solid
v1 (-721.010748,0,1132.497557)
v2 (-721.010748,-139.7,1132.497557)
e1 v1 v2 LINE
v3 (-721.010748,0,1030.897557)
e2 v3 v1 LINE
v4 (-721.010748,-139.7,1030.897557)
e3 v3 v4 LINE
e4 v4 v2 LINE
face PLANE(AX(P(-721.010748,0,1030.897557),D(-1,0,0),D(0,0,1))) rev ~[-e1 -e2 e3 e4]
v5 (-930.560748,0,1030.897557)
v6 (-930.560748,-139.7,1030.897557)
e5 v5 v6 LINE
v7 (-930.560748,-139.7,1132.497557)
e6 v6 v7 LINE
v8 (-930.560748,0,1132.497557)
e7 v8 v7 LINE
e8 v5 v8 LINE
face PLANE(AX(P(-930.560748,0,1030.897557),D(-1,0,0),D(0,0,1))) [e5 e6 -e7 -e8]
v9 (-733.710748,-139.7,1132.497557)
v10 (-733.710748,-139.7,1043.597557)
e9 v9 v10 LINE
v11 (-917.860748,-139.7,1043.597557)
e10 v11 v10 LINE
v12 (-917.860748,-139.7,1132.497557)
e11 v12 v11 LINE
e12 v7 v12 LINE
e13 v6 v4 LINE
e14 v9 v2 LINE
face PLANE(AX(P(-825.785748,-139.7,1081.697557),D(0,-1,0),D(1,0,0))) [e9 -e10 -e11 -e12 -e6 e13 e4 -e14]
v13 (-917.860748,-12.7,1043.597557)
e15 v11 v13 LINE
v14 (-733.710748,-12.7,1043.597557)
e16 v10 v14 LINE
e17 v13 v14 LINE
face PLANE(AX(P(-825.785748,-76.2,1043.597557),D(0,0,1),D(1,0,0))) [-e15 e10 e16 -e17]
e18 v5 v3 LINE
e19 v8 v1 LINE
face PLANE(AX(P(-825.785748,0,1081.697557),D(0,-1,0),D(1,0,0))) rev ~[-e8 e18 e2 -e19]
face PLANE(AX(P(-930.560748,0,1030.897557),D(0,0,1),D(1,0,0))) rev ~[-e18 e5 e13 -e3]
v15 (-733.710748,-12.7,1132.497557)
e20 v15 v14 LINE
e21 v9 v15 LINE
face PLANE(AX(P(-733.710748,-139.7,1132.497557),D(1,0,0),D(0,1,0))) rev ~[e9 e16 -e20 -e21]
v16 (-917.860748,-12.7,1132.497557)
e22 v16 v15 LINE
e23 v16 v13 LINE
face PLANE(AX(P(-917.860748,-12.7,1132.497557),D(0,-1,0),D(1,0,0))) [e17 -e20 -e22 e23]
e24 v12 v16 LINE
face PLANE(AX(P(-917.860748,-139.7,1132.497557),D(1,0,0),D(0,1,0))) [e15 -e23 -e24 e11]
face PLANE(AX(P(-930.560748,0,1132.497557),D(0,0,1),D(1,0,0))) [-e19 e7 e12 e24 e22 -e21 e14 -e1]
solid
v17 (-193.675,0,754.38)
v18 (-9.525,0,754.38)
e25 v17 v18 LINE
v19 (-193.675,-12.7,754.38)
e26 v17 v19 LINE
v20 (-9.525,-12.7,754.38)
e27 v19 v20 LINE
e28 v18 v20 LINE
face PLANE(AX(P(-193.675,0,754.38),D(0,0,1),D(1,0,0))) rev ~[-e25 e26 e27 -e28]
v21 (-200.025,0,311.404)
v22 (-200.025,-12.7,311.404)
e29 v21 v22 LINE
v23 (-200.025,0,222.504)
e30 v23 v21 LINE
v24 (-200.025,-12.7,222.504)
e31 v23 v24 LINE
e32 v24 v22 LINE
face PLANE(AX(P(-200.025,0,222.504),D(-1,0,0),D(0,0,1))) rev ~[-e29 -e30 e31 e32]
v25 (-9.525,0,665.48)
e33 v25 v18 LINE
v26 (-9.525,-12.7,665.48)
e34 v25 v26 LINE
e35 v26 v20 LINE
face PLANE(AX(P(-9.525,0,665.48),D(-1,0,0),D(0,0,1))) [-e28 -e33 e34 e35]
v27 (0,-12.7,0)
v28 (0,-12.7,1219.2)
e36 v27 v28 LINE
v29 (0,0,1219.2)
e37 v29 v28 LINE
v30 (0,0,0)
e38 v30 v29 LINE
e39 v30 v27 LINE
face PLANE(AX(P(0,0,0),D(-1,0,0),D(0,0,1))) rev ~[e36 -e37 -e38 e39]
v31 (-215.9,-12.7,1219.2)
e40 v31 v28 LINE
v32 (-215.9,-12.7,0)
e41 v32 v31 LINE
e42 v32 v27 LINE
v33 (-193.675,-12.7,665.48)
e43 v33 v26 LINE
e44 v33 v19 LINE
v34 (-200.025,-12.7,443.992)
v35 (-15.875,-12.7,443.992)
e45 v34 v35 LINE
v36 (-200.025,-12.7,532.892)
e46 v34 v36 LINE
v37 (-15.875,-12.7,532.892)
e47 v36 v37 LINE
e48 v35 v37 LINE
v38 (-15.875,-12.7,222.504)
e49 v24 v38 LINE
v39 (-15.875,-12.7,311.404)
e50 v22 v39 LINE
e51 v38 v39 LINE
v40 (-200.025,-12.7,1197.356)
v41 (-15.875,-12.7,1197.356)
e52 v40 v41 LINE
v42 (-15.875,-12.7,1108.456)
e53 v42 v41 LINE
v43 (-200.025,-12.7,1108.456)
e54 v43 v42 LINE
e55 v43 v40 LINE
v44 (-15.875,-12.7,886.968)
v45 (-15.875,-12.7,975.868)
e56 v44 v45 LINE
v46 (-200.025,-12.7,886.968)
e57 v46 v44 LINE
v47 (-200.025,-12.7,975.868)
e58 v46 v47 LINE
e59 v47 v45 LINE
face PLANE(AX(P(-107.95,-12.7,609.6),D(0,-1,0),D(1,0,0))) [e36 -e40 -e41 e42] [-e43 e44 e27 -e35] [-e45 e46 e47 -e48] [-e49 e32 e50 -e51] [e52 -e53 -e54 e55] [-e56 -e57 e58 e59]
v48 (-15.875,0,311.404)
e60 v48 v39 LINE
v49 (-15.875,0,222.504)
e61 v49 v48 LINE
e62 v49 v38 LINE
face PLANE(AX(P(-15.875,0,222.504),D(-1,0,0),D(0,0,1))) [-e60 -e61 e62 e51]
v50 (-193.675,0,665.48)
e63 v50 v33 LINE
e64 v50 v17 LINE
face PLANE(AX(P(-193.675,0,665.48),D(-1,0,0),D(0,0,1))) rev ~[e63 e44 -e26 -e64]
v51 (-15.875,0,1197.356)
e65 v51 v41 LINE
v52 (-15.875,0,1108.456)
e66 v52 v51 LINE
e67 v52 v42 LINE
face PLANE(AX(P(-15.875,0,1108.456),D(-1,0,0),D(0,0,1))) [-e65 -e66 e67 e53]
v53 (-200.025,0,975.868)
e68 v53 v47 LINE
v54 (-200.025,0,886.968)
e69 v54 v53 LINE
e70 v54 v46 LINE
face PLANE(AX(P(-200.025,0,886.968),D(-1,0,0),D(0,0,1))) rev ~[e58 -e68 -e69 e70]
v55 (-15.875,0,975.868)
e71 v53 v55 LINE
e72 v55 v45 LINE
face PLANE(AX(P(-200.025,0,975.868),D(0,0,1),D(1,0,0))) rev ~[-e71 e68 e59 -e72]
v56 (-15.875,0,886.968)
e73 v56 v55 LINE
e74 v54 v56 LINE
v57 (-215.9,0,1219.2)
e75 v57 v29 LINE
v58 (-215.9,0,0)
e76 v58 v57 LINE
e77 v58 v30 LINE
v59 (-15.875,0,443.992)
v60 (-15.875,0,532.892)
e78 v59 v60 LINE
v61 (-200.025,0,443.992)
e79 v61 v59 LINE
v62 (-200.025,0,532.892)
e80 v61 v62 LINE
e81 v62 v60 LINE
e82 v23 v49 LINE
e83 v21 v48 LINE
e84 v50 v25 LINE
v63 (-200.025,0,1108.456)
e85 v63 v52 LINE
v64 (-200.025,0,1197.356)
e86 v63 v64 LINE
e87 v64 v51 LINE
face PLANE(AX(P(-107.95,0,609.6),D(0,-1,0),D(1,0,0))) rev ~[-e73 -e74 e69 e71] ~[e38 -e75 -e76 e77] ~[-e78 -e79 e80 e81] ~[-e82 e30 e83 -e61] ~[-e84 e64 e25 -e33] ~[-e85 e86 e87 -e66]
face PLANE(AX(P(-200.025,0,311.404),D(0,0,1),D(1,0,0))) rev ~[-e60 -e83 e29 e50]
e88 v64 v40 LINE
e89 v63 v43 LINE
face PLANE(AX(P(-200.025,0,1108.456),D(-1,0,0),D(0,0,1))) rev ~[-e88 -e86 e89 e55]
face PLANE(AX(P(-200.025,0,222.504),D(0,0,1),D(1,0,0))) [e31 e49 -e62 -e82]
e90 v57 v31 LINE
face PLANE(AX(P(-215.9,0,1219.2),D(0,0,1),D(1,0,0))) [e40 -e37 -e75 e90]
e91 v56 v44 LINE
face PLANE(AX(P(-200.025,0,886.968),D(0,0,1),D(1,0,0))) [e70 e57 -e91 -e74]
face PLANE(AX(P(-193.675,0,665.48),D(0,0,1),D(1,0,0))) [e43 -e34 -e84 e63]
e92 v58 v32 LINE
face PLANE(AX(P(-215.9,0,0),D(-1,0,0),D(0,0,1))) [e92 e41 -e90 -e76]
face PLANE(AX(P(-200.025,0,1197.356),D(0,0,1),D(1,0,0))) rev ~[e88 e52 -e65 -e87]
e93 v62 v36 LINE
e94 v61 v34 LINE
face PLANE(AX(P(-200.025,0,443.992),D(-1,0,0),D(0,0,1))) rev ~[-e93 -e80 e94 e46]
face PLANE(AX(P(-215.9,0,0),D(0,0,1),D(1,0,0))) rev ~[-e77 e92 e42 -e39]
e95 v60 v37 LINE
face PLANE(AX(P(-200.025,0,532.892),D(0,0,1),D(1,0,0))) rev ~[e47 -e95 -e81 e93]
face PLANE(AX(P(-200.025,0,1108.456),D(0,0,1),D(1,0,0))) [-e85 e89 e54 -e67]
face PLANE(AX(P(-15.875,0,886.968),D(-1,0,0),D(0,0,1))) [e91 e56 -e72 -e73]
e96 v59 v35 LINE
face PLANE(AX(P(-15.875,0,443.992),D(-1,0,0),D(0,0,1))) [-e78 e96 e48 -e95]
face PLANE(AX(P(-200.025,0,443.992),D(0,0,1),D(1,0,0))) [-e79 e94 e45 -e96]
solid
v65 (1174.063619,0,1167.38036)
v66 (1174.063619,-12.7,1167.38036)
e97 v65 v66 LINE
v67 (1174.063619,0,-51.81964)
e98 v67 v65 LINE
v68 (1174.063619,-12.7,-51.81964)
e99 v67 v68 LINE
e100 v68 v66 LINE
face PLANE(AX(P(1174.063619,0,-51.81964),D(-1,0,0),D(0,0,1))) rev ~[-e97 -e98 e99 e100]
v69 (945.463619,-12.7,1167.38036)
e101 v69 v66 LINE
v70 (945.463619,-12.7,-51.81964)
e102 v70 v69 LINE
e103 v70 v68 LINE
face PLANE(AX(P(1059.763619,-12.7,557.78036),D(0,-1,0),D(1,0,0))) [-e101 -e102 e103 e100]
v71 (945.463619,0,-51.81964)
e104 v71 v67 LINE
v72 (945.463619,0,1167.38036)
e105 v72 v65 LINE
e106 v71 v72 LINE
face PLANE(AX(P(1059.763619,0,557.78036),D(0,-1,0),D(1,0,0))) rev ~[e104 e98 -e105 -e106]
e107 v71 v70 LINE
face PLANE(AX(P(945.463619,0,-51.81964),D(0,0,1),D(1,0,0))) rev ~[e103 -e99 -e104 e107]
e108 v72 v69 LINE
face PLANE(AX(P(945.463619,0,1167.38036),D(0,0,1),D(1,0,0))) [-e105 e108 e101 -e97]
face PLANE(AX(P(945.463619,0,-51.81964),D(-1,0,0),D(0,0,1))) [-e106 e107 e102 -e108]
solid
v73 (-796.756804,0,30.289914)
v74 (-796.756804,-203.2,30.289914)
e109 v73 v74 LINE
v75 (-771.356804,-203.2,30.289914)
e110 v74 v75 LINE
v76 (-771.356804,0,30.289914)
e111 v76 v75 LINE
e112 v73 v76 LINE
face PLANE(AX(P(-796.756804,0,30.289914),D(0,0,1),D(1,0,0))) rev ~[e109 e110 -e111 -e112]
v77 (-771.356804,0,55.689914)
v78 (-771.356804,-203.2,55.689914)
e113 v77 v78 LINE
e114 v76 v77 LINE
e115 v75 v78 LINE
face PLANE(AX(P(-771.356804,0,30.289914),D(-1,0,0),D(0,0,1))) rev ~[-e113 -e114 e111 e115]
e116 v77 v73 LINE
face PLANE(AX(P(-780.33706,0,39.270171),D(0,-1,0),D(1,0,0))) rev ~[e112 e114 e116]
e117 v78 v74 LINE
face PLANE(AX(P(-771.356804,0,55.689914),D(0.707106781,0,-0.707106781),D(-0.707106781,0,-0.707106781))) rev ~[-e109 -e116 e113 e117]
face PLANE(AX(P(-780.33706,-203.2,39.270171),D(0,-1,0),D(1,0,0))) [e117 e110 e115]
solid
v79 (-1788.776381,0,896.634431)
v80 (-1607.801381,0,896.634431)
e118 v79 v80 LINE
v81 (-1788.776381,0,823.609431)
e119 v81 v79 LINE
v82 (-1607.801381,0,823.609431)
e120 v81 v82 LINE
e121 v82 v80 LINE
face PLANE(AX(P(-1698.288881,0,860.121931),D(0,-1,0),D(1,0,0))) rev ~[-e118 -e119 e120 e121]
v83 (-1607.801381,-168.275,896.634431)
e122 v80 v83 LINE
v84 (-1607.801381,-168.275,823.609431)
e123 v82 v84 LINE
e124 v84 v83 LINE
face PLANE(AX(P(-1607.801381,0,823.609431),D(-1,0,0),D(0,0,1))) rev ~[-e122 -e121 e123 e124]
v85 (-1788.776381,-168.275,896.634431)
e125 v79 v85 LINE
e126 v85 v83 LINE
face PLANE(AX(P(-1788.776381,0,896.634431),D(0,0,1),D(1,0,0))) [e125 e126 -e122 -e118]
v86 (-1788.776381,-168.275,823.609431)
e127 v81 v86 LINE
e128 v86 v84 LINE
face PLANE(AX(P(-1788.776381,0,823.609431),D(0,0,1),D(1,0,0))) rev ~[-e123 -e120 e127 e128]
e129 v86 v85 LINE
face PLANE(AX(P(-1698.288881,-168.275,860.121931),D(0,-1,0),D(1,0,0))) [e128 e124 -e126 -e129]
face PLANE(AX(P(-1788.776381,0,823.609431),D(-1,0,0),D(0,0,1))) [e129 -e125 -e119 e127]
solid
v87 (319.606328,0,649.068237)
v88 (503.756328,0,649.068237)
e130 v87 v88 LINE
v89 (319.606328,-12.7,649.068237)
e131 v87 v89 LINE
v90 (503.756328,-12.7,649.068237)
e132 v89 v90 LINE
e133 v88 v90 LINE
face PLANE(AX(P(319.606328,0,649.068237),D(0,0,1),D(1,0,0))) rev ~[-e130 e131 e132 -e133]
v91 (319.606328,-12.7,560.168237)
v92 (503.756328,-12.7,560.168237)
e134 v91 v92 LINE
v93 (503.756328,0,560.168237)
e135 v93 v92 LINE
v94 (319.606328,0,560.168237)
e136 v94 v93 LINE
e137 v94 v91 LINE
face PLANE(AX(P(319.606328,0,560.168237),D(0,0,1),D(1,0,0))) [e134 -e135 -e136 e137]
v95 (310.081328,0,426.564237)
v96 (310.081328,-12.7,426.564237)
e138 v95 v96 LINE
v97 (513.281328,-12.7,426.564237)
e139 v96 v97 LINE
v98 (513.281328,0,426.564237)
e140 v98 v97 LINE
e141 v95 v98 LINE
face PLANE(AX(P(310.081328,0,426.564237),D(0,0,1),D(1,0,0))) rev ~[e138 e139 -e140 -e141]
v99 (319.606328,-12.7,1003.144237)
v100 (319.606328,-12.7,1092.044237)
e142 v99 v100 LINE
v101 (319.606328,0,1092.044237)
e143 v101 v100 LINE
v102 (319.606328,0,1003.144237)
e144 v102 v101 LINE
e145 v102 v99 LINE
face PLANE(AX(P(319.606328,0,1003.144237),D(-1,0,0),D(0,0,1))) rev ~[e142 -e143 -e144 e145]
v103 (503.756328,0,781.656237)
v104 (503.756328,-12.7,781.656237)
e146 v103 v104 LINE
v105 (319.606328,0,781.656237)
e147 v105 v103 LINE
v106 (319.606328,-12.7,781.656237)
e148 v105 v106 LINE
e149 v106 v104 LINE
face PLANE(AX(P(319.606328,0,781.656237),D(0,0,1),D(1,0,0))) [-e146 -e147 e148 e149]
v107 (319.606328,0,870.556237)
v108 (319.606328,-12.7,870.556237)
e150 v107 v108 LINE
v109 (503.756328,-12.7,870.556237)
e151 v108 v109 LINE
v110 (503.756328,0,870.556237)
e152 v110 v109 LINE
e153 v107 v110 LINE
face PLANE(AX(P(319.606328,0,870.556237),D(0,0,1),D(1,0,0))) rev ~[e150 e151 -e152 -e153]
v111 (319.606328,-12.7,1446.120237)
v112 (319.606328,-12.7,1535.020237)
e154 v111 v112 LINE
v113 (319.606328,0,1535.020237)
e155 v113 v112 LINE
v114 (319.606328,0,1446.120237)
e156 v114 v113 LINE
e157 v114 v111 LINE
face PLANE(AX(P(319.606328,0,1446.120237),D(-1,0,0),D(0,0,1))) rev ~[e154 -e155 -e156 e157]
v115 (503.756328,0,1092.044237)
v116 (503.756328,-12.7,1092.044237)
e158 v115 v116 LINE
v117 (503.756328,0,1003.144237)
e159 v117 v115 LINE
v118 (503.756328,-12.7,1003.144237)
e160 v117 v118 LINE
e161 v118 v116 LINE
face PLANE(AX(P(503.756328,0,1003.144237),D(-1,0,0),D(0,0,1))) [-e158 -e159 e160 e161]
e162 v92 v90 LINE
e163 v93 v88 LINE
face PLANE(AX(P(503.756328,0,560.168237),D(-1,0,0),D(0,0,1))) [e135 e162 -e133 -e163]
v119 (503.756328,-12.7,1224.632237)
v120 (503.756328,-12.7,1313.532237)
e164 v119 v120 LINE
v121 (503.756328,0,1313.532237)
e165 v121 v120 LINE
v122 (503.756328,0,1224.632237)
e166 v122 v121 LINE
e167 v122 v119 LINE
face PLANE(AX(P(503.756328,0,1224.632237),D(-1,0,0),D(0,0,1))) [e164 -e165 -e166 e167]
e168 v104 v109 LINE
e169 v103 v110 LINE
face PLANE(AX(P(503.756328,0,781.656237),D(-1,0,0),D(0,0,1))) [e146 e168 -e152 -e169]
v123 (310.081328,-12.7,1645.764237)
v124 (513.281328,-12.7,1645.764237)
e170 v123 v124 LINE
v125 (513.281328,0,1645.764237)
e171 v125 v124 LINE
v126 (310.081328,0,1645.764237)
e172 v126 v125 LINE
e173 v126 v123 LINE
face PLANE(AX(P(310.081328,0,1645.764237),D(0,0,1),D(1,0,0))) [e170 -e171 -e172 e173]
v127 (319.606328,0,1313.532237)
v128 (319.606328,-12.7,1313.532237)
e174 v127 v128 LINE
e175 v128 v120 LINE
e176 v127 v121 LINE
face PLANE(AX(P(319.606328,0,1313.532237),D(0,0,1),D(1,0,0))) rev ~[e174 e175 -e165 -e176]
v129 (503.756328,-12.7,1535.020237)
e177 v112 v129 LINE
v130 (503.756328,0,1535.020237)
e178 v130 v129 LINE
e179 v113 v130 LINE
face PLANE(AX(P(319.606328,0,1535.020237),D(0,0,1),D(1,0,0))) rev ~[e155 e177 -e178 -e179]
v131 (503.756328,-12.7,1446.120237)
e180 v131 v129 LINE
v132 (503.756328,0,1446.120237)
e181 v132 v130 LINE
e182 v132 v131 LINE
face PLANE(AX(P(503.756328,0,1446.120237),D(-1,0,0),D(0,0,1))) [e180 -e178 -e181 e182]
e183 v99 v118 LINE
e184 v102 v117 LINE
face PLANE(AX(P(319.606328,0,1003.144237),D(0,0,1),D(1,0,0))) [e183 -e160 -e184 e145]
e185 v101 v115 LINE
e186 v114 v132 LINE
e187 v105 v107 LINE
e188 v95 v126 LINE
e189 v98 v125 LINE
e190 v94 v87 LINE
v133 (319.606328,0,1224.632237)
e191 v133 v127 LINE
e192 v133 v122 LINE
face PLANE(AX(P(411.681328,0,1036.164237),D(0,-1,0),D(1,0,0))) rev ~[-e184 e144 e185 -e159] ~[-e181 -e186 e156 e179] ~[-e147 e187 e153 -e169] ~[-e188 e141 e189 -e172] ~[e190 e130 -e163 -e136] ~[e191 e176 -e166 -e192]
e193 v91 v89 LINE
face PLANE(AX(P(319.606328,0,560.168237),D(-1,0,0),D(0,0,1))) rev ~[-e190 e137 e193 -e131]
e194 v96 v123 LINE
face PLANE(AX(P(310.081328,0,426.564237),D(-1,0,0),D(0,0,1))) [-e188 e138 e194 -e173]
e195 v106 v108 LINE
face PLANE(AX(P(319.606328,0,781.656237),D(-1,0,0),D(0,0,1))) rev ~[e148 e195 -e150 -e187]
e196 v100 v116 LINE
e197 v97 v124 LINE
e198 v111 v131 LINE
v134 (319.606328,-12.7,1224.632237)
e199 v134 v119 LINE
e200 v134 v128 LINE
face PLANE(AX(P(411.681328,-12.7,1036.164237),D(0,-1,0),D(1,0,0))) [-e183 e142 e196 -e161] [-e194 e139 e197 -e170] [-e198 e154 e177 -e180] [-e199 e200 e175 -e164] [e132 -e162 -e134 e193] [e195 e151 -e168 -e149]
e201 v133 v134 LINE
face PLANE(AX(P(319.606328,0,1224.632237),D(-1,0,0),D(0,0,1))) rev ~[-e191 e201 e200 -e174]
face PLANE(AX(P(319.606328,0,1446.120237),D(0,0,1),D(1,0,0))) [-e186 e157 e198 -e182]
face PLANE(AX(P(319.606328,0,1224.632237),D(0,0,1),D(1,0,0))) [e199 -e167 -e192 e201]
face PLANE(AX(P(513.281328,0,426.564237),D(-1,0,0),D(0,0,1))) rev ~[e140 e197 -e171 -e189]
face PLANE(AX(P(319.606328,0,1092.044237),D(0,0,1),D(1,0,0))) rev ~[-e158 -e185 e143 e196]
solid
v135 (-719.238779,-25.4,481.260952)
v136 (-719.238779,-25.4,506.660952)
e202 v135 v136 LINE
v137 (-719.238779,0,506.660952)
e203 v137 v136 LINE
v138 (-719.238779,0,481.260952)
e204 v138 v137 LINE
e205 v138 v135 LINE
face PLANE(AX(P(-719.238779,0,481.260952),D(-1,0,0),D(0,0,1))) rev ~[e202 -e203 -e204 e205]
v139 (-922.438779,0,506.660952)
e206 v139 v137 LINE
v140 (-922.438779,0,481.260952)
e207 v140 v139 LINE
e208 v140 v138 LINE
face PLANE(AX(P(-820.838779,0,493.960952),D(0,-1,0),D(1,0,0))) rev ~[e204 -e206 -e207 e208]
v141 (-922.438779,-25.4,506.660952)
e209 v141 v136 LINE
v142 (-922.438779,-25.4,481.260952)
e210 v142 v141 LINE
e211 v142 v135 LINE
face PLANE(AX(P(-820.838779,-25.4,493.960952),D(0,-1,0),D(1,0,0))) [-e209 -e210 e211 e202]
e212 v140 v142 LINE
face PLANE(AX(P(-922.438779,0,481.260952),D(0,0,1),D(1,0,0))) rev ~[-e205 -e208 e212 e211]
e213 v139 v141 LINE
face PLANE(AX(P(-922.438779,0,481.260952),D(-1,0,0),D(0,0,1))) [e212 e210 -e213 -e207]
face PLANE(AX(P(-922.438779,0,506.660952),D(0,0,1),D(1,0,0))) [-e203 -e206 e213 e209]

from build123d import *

# Parameters (mm, degrees)
F0_W      = 215.9
F0_H      = 1219.2
F0_W_2    = 184.15
F0_H_2    = 88.9
F1_DEPTH  = 12.7
F2_W      = 203.2
F2_H      = 1219.2
F2_W_2    = 184.15
F2_H_2    = 88.9
F3_DEPTH  = 12.7
F4_W      = 209.55
F4_H      = 101.6
F5_DEPTH  = 139.7
F6_W      = 184.15
F6_H      = 127
F7_DEPTH  = 88.9
F8_W      = 203.2
F8_H      = 25.4
F10_DEPTH = 25.4
F9_W      = 180.975
F9_H      = 73.025
F11_DEPTH = 168.275
F12_W     = 228.6
F12_H     = 1219.2
F13_DEPTH = 12.7
F15_DEPTH = 203.2


# Not quite as in the source:
# - a feature names something its author has since deleted; it is built from what else it names


with BuildPart() as f1:
    # F0 (on Front) → F1 (new body)
    with BuildSketch(Plane.XZ):
        with Locations((-107.95, 609.6)):
            Rectangle(F0_W, F0_H)
        with Locations((-107.95, 266.954)):
            Rectangle(F0_W_2, F0_H_2, mode=Mode.SUBTRACT)
        with Locations((-107.95, 488.442)):
            Rectangle(F0_W_2, F0_H_2, mode=Mode.SUBTRACT)
        with Locations((-101.6, 709.93)):
            Rectangle(F0_W_2, F0_H_2, mode=Mode.SUBTRACT)
        with Locations((-107.95, 931.418)):
            Rectangle(F0_W_2, F0_H_2, mode=Mode.SUBTRACT)
        with Locations((-107.95, 1152.906)):
            Rectangle(F0_W_2, F0_H_2, mode=Mode.SUBTRACT)
    extrude(amount=F1_DEPTH)


with BuildPart() as f3:
    # F2 (on Front) → F3 (new body)
    with BuildSketch(Plane.XZ):
        with Locations((411.6813279688, 1036.1642371192)):
            Rectangle(F2_W, F2_H)
        with Locations((411.6813279688, 604.6182371192)):
            Rectangle(F2_W_2, F2_H_2, mode=Mode.SUBTRACT)
        with Locations((411.6813279688, 826.1062371192)):
            Rectangle(F2_W_2, F2_H_2, mode=Mode.SUBTRACT)
        with Locations((411.6813279688, 1047.5942371192)):
            Rectangle(F2_W_2, F2_H_2, mode=Mode.SUBTRACT)
        with Locations((411.6813279688, 1269.0822371192)):
            Rectangle(F2_W_2, F2_H_2, mode=Mode.SUBTRACT)
        with Locations((411.6813279688, 1490.5702371192)):
            Rectangle(F2_W_2, F2_H_2, mode=Mode.SUBTRACT)
    extrude(amount=F3_DEPTH)


with BuildPart() as f5:
    # F4 (on Front) → F5 (new body)
    with BuildSketch(Plane.XZ):
        with Locations((-825.7857475758, 1081.6975569915)):
            Rectangle(F4_W, F4_H)
    extrude(amount=F5_DEPTH)

    # F6 (on face) → F7 (cut)
    with BuildSketch(Plane.XY.offset(1132.4975569915)):
        with Locations((-825.7857475758, -76.2)):
            Rectangle(F6_W, F6_H)
    extrude(amount=-F7_DEPTH, mode=Mode.SUBTRACT)


with BuildPart() as f10:
    # F8 (on Front) → F10 (new body)
    with BuildSketch(Plane.XZ):
        with Locations((-820.838779211, 493.9609521501)):
            Rectangle(F8_W, F8_H)
    extrude(amount=F10_DEPTH)


with BuildPart() as f11:
    # F9 (on Front) → F11 (new body)
    with BuildSketch(Plane.XZ):
        with Locations((-1698.2888811625, 860.1219307423)):
            Rectangle(F9_W, F9_H)
    extrude(amount=F11_DEPTH)


with BuildPart() as f13:
    # F12 (on Front) → F13 (new body)
    with BuildSketch(Plane.XZ):
        with Locations((1059.7636188984, 557.7803601671)):
            Rectangle(F12_W, F12_H)
    extrude(amount=F13_DEPTH)


with BuildPart() as f15:
    # F14 (on Front) → F15 (new body)
    with BuildSketch(Plane.XZ):
        Polygon((-771.3568039894, 30.289914459), (-771.3568039894, 55.689914459), (-796.7568039894, 30.289914459), align=None)
    extrude(amount=F15_DEPTH)


solid = Compound([f1.part, f3.part, f5.part, f10.part, f11.part, f13.part, f15.part])
